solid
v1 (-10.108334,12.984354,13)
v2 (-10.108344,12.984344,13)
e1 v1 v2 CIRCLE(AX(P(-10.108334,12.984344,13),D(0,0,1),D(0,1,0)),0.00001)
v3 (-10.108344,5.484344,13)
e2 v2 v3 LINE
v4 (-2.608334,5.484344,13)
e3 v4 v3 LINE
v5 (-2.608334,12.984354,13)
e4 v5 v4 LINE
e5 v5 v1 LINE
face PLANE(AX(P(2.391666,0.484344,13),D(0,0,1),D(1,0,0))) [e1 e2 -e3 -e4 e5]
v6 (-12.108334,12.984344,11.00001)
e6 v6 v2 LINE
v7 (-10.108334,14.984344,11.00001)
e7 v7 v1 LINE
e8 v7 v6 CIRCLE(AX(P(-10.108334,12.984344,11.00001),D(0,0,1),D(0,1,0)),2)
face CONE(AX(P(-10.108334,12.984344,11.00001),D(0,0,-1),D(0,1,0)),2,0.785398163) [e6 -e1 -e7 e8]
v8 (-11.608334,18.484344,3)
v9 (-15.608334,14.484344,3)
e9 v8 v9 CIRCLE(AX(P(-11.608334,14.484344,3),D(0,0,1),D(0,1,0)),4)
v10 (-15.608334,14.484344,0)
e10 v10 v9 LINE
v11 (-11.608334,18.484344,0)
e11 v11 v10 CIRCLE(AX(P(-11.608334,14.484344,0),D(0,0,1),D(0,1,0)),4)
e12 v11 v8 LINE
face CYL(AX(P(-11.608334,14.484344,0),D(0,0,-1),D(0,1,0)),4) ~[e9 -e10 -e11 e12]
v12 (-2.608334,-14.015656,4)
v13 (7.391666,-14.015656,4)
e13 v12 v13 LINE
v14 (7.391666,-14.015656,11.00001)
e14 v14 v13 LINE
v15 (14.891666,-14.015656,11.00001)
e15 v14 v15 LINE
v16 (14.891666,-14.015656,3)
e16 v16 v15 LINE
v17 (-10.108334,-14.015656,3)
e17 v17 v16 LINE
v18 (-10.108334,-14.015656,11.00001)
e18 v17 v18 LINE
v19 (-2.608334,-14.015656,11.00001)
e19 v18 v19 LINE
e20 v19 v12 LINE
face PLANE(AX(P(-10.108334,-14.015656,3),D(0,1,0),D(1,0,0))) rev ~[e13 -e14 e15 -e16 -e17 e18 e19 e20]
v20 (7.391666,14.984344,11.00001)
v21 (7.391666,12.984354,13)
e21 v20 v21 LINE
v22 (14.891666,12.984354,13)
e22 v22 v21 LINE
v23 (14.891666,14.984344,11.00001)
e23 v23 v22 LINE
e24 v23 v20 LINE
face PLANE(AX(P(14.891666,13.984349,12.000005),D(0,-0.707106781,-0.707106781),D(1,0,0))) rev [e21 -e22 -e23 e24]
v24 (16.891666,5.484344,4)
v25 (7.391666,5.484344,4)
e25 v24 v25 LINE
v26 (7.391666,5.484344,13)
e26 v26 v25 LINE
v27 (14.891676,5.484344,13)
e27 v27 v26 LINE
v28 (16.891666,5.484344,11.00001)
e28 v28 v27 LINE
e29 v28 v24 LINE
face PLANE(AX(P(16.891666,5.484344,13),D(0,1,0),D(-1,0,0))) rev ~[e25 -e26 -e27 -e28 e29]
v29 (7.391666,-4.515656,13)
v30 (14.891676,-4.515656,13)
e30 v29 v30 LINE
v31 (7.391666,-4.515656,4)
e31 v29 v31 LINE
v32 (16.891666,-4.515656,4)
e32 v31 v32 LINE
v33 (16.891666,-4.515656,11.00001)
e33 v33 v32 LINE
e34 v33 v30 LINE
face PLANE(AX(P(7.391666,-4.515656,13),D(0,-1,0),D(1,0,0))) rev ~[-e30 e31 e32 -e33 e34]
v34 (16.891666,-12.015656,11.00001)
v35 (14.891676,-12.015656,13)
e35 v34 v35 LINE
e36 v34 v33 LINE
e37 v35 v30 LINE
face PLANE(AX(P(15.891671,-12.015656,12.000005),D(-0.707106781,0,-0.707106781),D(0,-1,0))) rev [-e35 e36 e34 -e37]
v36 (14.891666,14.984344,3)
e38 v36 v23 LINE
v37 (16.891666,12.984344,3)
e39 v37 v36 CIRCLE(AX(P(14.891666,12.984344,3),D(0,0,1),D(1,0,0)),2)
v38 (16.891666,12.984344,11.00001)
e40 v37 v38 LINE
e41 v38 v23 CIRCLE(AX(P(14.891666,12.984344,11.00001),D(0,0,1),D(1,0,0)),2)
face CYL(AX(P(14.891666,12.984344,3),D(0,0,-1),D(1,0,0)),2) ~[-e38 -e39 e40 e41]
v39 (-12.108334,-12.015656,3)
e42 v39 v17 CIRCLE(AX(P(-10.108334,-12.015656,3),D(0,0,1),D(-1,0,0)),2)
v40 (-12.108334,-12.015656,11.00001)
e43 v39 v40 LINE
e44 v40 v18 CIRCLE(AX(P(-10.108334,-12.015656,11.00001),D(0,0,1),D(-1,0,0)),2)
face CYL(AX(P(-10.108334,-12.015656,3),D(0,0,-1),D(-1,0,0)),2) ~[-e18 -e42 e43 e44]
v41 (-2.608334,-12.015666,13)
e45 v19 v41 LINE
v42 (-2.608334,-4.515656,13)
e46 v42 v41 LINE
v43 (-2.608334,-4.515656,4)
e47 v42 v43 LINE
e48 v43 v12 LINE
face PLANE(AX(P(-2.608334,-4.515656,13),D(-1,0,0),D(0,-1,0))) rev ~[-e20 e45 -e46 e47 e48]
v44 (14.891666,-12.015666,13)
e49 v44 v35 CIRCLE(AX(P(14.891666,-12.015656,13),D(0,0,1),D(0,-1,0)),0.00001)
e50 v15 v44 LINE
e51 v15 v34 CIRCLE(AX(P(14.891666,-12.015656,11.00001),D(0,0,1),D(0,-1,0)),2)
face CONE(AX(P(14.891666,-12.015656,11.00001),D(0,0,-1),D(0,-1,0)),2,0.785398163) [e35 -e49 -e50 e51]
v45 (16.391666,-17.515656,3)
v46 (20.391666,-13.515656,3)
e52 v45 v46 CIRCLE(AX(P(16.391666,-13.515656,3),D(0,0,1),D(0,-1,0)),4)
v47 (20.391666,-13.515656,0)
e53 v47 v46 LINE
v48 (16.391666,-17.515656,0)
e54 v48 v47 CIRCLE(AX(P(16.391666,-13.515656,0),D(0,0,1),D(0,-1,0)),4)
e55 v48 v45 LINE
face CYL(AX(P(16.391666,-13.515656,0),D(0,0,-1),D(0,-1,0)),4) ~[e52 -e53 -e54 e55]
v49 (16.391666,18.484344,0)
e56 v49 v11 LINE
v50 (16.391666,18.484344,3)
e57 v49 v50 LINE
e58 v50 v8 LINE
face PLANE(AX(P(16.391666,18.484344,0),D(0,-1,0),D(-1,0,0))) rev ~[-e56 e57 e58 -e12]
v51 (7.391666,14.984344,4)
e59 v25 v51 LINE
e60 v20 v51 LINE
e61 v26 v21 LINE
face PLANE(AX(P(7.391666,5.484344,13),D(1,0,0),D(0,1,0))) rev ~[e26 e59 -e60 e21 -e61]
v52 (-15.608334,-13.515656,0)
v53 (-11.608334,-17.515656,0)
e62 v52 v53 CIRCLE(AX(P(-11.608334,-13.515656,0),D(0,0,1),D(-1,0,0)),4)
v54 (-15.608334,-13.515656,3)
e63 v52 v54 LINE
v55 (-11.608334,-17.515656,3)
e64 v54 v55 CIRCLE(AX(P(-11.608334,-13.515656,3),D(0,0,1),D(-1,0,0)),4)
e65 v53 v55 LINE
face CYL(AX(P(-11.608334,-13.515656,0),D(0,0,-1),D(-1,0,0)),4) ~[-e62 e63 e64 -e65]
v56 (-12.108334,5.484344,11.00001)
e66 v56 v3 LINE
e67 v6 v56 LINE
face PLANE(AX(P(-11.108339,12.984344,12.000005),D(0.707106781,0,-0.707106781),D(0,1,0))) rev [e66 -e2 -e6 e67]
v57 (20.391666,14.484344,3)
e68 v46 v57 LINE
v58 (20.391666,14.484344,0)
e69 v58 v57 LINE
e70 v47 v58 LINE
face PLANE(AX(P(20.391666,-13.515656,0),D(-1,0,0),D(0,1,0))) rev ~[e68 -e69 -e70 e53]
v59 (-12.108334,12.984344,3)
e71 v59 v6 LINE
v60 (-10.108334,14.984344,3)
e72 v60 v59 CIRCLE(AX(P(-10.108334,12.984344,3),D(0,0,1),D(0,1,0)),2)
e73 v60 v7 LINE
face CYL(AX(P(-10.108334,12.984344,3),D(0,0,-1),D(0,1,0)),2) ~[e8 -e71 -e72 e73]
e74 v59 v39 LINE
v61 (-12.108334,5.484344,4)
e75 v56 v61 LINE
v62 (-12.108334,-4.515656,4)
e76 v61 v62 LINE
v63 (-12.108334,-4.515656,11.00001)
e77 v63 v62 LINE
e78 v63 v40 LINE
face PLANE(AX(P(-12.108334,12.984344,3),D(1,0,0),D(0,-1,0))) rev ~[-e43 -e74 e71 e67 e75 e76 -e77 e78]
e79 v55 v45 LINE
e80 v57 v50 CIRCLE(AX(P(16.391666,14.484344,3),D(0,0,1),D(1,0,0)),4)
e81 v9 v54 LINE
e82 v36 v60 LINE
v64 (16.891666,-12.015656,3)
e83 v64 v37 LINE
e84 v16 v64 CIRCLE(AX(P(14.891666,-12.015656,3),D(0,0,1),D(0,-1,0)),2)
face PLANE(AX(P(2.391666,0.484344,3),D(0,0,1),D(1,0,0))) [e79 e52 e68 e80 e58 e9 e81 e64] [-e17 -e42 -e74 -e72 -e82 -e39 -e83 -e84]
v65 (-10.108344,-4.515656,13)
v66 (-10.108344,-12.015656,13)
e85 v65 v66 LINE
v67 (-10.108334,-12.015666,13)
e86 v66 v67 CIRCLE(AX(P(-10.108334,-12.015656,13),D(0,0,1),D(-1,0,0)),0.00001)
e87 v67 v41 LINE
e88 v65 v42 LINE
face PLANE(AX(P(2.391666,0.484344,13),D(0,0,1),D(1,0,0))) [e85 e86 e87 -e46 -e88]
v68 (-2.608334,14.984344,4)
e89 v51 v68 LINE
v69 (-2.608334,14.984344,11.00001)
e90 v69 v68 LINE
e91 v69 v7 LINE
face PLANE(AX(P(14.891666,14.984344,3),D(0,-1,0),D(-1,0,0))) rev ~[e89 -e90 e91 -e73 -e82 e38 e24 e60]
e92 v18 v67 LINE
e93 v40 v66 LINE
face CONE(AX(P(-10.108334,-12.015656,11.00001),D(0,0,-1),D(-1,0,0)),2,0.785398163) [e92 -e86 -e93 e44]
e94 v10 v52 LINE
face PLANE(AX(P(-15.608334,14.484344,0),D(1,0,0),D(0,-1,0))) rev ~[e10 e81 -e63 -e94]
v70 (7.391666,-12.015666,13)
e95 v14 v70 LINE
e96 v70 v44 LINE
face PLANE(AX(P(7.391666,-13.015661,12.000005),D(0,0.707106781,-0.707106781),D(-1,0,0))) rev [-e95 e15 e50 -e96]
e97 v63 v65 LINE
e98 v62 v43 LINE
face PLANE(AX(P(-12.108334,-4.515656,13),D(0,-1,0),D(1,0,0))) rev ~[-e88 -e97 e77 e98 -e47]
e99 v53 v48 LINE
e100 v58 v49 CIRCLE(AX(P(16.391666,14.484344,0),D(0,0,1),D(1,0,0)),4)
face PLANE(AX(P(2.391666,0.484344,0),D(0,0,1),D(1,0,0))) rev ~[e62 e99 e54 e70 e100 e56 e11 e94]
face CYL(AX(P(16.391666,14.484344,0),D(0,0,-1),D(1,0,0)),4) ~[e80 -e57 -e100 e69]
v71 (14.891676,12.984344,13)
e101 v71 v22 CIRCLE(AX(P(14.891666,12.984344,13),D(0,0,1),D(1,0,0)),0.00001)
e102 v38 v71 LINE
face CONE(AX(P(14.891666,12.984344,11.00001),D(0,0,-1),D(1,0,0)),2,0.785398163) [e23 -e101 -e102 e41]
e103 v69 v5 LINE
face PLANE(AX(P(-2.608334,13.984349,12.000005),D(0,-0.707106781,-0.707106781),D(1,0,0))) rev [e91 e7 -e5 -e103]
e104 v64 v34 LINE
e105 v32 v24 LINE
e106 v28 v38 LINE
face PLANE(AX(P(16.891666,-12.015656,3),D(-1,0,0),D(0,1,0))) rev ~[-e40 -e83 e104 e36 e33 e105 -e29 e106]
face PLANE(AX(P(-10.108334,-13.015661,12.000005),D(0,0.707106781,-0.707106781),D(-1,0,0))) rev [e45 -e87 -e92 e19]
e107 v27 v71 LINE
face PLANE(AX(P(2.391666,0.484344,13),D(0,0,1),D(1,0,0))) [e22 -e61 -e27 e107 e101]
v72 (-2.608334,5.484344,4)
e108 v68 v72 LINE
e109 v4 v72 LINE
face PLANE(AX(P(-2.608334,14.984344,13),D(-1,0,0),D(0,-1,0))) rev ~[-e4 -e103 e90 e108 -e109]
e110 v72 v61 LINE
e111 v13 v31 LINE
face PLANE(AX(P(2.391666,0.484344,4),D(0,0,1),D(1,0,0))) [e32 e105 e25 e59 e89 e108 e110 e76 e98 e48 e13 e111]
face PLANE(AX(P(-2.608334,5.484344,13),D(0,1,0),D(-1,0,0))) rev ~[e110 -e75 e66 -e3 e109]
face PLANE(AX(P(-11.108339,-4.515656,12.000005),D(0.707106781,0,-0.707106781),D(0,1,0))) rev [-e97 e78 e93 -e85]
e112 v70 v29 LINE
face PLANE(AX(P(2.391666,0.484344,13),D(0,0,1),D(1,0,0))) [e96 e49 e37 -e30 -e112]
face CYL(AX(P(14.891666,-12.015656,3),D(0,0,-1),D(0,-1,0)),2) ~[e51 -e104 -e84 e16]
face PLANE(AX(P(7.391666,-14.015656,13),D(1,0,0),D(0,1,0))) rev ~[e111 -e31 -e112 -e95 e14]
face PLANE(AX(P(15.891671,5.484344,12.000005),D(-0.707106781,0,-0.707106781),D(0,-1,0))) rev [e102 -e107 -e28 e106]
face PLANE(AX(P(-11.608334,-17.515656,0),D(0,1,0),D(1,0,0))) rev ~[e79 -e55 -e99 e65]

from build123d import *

# Parameters (mm, degrees)
F1_DEPTH = 3
F3_DEPTH = 10
F5_DEPTH = 9
F6_SIZE  = 1.99999


# Not quite as in the source:
# - a fillet or chamfer is up to 0.001 mm smaller than in the source, because OpenCascade refuses the exact size


with BuildPart() as f1:
    # F0 (on Top) → F1 (new body)
    with BuildSketch(Plane.XY):
        with BuildLine():
            Line((16.3916659281, 18.4843443355), (-11.6083340719, 18.4843443355))
            ThreePointArc((-11.6083340719, 18.4843443355), (-14.4367611967, 17.3127714603), (-15.6083340719, 14.4843443355))
            Line((-15.6083340719, 14.4843443355), (-15.6083340719, -13.5156556645))
            ThreePointArc((-15.6083340719, -13.5156556645), (-14.4367611967, -16.3440827892), (-11.6083340719, -17.5156556645))
            Line((-11.6083340719, -17.5156556645), (16.3916659281, -17.5156556645))
            ThreePointArc((16.3916659281, -17.5156556645), (19.2200930528, -16.3440827892), (20.3916659281, -13.5156556645))
            Line((20.3916659281, -13.5156556645), (20.3916659281, 14.4843443355))
            ThreePointArc((20.3916659281, 14.4843443355), (19.2200930528, 17.3127714603), (16.3916659281, 18.4843443355))
        make_face()
    extrude(amount=F1_DEPTH)

    # F2 (on face) → F3 (join)
    with BuildSketch(Plane.XY.offset(3)):
        with BuildLine():
            Line((14.8916659281, 14.9843443355), (-10.1083340719, 14.9843443355))
            ThreePointArc((-10.1083340719, 14.9843443355), (-11.5225476343, 14.3985578979), (-12.1083340719, 12.9843443355))
            Line((-12.1083340719, 12.9843443355), (-12.1083340719, -12.0156556645))
            ThreePointArc((-12.1083340719, -12.0156556645), (-11.5225476343, -13.4298692268), (-10.1083340719, -14.0156556645))
            Line((-10.1083340719, -14.0156556645), (14.8916659281, -14.0156556645))
            ThreePointArc((14.8916659281, -14.0156556645), (16.3058794904, -13.4298692268), (16.8916659281, -12.0156556645))
            Line((16.8916659281, -12.0156556645), (16.8916659281, 12.9843443355))
            ThreePointArc((16.8916659281, 12.9843443355), (16.3058794904, 14.3985578979), (14.8916659281, 14.9843443355))
        make_face()
    extrude(amount=F3_DEPTH)

    # F4 (on face) → F5 (cut)
    with BuildSketch(Plane.XY.offset(13)):
        Polygon((7.3916660622, 14.9843443355), (-2.6083340719, 14.9843443355), (-2.6083340719, 5.4843444377), (-12.1083340719, 5.4843444377), (-12.1083340719, -4.5156556645), (-2.6083340719, -4.5156556645), (-2.6083340719, -14.0156556645), (7.3916660622, -14.0156556645), (7.3916660622, -4.5156556645), (16.8916659281, -4.5156556645), (16.8916659281, 5.4843444377), (7.3916660622, 5.4843444377), align=None)
    extrude(amount=-F5_DEPTH, mode=Mode.SUBTRACT)

    # F6 (size 2 in the source; OpenCascade refuses exactly that, so slightly less here)
    f6_edges = [f1.edges().sort_by_distance(p)[0] for p in [
        (11.141666, -14.015656, 13),
        (-6.358334, -14.015656, 13),
        (16.891666, 9.234344, 13),
        (-12.108334, 9.234344, 13),
    ]]
    chamfer(f6_edges, length=F6_SIZE)


solid = f1.part
